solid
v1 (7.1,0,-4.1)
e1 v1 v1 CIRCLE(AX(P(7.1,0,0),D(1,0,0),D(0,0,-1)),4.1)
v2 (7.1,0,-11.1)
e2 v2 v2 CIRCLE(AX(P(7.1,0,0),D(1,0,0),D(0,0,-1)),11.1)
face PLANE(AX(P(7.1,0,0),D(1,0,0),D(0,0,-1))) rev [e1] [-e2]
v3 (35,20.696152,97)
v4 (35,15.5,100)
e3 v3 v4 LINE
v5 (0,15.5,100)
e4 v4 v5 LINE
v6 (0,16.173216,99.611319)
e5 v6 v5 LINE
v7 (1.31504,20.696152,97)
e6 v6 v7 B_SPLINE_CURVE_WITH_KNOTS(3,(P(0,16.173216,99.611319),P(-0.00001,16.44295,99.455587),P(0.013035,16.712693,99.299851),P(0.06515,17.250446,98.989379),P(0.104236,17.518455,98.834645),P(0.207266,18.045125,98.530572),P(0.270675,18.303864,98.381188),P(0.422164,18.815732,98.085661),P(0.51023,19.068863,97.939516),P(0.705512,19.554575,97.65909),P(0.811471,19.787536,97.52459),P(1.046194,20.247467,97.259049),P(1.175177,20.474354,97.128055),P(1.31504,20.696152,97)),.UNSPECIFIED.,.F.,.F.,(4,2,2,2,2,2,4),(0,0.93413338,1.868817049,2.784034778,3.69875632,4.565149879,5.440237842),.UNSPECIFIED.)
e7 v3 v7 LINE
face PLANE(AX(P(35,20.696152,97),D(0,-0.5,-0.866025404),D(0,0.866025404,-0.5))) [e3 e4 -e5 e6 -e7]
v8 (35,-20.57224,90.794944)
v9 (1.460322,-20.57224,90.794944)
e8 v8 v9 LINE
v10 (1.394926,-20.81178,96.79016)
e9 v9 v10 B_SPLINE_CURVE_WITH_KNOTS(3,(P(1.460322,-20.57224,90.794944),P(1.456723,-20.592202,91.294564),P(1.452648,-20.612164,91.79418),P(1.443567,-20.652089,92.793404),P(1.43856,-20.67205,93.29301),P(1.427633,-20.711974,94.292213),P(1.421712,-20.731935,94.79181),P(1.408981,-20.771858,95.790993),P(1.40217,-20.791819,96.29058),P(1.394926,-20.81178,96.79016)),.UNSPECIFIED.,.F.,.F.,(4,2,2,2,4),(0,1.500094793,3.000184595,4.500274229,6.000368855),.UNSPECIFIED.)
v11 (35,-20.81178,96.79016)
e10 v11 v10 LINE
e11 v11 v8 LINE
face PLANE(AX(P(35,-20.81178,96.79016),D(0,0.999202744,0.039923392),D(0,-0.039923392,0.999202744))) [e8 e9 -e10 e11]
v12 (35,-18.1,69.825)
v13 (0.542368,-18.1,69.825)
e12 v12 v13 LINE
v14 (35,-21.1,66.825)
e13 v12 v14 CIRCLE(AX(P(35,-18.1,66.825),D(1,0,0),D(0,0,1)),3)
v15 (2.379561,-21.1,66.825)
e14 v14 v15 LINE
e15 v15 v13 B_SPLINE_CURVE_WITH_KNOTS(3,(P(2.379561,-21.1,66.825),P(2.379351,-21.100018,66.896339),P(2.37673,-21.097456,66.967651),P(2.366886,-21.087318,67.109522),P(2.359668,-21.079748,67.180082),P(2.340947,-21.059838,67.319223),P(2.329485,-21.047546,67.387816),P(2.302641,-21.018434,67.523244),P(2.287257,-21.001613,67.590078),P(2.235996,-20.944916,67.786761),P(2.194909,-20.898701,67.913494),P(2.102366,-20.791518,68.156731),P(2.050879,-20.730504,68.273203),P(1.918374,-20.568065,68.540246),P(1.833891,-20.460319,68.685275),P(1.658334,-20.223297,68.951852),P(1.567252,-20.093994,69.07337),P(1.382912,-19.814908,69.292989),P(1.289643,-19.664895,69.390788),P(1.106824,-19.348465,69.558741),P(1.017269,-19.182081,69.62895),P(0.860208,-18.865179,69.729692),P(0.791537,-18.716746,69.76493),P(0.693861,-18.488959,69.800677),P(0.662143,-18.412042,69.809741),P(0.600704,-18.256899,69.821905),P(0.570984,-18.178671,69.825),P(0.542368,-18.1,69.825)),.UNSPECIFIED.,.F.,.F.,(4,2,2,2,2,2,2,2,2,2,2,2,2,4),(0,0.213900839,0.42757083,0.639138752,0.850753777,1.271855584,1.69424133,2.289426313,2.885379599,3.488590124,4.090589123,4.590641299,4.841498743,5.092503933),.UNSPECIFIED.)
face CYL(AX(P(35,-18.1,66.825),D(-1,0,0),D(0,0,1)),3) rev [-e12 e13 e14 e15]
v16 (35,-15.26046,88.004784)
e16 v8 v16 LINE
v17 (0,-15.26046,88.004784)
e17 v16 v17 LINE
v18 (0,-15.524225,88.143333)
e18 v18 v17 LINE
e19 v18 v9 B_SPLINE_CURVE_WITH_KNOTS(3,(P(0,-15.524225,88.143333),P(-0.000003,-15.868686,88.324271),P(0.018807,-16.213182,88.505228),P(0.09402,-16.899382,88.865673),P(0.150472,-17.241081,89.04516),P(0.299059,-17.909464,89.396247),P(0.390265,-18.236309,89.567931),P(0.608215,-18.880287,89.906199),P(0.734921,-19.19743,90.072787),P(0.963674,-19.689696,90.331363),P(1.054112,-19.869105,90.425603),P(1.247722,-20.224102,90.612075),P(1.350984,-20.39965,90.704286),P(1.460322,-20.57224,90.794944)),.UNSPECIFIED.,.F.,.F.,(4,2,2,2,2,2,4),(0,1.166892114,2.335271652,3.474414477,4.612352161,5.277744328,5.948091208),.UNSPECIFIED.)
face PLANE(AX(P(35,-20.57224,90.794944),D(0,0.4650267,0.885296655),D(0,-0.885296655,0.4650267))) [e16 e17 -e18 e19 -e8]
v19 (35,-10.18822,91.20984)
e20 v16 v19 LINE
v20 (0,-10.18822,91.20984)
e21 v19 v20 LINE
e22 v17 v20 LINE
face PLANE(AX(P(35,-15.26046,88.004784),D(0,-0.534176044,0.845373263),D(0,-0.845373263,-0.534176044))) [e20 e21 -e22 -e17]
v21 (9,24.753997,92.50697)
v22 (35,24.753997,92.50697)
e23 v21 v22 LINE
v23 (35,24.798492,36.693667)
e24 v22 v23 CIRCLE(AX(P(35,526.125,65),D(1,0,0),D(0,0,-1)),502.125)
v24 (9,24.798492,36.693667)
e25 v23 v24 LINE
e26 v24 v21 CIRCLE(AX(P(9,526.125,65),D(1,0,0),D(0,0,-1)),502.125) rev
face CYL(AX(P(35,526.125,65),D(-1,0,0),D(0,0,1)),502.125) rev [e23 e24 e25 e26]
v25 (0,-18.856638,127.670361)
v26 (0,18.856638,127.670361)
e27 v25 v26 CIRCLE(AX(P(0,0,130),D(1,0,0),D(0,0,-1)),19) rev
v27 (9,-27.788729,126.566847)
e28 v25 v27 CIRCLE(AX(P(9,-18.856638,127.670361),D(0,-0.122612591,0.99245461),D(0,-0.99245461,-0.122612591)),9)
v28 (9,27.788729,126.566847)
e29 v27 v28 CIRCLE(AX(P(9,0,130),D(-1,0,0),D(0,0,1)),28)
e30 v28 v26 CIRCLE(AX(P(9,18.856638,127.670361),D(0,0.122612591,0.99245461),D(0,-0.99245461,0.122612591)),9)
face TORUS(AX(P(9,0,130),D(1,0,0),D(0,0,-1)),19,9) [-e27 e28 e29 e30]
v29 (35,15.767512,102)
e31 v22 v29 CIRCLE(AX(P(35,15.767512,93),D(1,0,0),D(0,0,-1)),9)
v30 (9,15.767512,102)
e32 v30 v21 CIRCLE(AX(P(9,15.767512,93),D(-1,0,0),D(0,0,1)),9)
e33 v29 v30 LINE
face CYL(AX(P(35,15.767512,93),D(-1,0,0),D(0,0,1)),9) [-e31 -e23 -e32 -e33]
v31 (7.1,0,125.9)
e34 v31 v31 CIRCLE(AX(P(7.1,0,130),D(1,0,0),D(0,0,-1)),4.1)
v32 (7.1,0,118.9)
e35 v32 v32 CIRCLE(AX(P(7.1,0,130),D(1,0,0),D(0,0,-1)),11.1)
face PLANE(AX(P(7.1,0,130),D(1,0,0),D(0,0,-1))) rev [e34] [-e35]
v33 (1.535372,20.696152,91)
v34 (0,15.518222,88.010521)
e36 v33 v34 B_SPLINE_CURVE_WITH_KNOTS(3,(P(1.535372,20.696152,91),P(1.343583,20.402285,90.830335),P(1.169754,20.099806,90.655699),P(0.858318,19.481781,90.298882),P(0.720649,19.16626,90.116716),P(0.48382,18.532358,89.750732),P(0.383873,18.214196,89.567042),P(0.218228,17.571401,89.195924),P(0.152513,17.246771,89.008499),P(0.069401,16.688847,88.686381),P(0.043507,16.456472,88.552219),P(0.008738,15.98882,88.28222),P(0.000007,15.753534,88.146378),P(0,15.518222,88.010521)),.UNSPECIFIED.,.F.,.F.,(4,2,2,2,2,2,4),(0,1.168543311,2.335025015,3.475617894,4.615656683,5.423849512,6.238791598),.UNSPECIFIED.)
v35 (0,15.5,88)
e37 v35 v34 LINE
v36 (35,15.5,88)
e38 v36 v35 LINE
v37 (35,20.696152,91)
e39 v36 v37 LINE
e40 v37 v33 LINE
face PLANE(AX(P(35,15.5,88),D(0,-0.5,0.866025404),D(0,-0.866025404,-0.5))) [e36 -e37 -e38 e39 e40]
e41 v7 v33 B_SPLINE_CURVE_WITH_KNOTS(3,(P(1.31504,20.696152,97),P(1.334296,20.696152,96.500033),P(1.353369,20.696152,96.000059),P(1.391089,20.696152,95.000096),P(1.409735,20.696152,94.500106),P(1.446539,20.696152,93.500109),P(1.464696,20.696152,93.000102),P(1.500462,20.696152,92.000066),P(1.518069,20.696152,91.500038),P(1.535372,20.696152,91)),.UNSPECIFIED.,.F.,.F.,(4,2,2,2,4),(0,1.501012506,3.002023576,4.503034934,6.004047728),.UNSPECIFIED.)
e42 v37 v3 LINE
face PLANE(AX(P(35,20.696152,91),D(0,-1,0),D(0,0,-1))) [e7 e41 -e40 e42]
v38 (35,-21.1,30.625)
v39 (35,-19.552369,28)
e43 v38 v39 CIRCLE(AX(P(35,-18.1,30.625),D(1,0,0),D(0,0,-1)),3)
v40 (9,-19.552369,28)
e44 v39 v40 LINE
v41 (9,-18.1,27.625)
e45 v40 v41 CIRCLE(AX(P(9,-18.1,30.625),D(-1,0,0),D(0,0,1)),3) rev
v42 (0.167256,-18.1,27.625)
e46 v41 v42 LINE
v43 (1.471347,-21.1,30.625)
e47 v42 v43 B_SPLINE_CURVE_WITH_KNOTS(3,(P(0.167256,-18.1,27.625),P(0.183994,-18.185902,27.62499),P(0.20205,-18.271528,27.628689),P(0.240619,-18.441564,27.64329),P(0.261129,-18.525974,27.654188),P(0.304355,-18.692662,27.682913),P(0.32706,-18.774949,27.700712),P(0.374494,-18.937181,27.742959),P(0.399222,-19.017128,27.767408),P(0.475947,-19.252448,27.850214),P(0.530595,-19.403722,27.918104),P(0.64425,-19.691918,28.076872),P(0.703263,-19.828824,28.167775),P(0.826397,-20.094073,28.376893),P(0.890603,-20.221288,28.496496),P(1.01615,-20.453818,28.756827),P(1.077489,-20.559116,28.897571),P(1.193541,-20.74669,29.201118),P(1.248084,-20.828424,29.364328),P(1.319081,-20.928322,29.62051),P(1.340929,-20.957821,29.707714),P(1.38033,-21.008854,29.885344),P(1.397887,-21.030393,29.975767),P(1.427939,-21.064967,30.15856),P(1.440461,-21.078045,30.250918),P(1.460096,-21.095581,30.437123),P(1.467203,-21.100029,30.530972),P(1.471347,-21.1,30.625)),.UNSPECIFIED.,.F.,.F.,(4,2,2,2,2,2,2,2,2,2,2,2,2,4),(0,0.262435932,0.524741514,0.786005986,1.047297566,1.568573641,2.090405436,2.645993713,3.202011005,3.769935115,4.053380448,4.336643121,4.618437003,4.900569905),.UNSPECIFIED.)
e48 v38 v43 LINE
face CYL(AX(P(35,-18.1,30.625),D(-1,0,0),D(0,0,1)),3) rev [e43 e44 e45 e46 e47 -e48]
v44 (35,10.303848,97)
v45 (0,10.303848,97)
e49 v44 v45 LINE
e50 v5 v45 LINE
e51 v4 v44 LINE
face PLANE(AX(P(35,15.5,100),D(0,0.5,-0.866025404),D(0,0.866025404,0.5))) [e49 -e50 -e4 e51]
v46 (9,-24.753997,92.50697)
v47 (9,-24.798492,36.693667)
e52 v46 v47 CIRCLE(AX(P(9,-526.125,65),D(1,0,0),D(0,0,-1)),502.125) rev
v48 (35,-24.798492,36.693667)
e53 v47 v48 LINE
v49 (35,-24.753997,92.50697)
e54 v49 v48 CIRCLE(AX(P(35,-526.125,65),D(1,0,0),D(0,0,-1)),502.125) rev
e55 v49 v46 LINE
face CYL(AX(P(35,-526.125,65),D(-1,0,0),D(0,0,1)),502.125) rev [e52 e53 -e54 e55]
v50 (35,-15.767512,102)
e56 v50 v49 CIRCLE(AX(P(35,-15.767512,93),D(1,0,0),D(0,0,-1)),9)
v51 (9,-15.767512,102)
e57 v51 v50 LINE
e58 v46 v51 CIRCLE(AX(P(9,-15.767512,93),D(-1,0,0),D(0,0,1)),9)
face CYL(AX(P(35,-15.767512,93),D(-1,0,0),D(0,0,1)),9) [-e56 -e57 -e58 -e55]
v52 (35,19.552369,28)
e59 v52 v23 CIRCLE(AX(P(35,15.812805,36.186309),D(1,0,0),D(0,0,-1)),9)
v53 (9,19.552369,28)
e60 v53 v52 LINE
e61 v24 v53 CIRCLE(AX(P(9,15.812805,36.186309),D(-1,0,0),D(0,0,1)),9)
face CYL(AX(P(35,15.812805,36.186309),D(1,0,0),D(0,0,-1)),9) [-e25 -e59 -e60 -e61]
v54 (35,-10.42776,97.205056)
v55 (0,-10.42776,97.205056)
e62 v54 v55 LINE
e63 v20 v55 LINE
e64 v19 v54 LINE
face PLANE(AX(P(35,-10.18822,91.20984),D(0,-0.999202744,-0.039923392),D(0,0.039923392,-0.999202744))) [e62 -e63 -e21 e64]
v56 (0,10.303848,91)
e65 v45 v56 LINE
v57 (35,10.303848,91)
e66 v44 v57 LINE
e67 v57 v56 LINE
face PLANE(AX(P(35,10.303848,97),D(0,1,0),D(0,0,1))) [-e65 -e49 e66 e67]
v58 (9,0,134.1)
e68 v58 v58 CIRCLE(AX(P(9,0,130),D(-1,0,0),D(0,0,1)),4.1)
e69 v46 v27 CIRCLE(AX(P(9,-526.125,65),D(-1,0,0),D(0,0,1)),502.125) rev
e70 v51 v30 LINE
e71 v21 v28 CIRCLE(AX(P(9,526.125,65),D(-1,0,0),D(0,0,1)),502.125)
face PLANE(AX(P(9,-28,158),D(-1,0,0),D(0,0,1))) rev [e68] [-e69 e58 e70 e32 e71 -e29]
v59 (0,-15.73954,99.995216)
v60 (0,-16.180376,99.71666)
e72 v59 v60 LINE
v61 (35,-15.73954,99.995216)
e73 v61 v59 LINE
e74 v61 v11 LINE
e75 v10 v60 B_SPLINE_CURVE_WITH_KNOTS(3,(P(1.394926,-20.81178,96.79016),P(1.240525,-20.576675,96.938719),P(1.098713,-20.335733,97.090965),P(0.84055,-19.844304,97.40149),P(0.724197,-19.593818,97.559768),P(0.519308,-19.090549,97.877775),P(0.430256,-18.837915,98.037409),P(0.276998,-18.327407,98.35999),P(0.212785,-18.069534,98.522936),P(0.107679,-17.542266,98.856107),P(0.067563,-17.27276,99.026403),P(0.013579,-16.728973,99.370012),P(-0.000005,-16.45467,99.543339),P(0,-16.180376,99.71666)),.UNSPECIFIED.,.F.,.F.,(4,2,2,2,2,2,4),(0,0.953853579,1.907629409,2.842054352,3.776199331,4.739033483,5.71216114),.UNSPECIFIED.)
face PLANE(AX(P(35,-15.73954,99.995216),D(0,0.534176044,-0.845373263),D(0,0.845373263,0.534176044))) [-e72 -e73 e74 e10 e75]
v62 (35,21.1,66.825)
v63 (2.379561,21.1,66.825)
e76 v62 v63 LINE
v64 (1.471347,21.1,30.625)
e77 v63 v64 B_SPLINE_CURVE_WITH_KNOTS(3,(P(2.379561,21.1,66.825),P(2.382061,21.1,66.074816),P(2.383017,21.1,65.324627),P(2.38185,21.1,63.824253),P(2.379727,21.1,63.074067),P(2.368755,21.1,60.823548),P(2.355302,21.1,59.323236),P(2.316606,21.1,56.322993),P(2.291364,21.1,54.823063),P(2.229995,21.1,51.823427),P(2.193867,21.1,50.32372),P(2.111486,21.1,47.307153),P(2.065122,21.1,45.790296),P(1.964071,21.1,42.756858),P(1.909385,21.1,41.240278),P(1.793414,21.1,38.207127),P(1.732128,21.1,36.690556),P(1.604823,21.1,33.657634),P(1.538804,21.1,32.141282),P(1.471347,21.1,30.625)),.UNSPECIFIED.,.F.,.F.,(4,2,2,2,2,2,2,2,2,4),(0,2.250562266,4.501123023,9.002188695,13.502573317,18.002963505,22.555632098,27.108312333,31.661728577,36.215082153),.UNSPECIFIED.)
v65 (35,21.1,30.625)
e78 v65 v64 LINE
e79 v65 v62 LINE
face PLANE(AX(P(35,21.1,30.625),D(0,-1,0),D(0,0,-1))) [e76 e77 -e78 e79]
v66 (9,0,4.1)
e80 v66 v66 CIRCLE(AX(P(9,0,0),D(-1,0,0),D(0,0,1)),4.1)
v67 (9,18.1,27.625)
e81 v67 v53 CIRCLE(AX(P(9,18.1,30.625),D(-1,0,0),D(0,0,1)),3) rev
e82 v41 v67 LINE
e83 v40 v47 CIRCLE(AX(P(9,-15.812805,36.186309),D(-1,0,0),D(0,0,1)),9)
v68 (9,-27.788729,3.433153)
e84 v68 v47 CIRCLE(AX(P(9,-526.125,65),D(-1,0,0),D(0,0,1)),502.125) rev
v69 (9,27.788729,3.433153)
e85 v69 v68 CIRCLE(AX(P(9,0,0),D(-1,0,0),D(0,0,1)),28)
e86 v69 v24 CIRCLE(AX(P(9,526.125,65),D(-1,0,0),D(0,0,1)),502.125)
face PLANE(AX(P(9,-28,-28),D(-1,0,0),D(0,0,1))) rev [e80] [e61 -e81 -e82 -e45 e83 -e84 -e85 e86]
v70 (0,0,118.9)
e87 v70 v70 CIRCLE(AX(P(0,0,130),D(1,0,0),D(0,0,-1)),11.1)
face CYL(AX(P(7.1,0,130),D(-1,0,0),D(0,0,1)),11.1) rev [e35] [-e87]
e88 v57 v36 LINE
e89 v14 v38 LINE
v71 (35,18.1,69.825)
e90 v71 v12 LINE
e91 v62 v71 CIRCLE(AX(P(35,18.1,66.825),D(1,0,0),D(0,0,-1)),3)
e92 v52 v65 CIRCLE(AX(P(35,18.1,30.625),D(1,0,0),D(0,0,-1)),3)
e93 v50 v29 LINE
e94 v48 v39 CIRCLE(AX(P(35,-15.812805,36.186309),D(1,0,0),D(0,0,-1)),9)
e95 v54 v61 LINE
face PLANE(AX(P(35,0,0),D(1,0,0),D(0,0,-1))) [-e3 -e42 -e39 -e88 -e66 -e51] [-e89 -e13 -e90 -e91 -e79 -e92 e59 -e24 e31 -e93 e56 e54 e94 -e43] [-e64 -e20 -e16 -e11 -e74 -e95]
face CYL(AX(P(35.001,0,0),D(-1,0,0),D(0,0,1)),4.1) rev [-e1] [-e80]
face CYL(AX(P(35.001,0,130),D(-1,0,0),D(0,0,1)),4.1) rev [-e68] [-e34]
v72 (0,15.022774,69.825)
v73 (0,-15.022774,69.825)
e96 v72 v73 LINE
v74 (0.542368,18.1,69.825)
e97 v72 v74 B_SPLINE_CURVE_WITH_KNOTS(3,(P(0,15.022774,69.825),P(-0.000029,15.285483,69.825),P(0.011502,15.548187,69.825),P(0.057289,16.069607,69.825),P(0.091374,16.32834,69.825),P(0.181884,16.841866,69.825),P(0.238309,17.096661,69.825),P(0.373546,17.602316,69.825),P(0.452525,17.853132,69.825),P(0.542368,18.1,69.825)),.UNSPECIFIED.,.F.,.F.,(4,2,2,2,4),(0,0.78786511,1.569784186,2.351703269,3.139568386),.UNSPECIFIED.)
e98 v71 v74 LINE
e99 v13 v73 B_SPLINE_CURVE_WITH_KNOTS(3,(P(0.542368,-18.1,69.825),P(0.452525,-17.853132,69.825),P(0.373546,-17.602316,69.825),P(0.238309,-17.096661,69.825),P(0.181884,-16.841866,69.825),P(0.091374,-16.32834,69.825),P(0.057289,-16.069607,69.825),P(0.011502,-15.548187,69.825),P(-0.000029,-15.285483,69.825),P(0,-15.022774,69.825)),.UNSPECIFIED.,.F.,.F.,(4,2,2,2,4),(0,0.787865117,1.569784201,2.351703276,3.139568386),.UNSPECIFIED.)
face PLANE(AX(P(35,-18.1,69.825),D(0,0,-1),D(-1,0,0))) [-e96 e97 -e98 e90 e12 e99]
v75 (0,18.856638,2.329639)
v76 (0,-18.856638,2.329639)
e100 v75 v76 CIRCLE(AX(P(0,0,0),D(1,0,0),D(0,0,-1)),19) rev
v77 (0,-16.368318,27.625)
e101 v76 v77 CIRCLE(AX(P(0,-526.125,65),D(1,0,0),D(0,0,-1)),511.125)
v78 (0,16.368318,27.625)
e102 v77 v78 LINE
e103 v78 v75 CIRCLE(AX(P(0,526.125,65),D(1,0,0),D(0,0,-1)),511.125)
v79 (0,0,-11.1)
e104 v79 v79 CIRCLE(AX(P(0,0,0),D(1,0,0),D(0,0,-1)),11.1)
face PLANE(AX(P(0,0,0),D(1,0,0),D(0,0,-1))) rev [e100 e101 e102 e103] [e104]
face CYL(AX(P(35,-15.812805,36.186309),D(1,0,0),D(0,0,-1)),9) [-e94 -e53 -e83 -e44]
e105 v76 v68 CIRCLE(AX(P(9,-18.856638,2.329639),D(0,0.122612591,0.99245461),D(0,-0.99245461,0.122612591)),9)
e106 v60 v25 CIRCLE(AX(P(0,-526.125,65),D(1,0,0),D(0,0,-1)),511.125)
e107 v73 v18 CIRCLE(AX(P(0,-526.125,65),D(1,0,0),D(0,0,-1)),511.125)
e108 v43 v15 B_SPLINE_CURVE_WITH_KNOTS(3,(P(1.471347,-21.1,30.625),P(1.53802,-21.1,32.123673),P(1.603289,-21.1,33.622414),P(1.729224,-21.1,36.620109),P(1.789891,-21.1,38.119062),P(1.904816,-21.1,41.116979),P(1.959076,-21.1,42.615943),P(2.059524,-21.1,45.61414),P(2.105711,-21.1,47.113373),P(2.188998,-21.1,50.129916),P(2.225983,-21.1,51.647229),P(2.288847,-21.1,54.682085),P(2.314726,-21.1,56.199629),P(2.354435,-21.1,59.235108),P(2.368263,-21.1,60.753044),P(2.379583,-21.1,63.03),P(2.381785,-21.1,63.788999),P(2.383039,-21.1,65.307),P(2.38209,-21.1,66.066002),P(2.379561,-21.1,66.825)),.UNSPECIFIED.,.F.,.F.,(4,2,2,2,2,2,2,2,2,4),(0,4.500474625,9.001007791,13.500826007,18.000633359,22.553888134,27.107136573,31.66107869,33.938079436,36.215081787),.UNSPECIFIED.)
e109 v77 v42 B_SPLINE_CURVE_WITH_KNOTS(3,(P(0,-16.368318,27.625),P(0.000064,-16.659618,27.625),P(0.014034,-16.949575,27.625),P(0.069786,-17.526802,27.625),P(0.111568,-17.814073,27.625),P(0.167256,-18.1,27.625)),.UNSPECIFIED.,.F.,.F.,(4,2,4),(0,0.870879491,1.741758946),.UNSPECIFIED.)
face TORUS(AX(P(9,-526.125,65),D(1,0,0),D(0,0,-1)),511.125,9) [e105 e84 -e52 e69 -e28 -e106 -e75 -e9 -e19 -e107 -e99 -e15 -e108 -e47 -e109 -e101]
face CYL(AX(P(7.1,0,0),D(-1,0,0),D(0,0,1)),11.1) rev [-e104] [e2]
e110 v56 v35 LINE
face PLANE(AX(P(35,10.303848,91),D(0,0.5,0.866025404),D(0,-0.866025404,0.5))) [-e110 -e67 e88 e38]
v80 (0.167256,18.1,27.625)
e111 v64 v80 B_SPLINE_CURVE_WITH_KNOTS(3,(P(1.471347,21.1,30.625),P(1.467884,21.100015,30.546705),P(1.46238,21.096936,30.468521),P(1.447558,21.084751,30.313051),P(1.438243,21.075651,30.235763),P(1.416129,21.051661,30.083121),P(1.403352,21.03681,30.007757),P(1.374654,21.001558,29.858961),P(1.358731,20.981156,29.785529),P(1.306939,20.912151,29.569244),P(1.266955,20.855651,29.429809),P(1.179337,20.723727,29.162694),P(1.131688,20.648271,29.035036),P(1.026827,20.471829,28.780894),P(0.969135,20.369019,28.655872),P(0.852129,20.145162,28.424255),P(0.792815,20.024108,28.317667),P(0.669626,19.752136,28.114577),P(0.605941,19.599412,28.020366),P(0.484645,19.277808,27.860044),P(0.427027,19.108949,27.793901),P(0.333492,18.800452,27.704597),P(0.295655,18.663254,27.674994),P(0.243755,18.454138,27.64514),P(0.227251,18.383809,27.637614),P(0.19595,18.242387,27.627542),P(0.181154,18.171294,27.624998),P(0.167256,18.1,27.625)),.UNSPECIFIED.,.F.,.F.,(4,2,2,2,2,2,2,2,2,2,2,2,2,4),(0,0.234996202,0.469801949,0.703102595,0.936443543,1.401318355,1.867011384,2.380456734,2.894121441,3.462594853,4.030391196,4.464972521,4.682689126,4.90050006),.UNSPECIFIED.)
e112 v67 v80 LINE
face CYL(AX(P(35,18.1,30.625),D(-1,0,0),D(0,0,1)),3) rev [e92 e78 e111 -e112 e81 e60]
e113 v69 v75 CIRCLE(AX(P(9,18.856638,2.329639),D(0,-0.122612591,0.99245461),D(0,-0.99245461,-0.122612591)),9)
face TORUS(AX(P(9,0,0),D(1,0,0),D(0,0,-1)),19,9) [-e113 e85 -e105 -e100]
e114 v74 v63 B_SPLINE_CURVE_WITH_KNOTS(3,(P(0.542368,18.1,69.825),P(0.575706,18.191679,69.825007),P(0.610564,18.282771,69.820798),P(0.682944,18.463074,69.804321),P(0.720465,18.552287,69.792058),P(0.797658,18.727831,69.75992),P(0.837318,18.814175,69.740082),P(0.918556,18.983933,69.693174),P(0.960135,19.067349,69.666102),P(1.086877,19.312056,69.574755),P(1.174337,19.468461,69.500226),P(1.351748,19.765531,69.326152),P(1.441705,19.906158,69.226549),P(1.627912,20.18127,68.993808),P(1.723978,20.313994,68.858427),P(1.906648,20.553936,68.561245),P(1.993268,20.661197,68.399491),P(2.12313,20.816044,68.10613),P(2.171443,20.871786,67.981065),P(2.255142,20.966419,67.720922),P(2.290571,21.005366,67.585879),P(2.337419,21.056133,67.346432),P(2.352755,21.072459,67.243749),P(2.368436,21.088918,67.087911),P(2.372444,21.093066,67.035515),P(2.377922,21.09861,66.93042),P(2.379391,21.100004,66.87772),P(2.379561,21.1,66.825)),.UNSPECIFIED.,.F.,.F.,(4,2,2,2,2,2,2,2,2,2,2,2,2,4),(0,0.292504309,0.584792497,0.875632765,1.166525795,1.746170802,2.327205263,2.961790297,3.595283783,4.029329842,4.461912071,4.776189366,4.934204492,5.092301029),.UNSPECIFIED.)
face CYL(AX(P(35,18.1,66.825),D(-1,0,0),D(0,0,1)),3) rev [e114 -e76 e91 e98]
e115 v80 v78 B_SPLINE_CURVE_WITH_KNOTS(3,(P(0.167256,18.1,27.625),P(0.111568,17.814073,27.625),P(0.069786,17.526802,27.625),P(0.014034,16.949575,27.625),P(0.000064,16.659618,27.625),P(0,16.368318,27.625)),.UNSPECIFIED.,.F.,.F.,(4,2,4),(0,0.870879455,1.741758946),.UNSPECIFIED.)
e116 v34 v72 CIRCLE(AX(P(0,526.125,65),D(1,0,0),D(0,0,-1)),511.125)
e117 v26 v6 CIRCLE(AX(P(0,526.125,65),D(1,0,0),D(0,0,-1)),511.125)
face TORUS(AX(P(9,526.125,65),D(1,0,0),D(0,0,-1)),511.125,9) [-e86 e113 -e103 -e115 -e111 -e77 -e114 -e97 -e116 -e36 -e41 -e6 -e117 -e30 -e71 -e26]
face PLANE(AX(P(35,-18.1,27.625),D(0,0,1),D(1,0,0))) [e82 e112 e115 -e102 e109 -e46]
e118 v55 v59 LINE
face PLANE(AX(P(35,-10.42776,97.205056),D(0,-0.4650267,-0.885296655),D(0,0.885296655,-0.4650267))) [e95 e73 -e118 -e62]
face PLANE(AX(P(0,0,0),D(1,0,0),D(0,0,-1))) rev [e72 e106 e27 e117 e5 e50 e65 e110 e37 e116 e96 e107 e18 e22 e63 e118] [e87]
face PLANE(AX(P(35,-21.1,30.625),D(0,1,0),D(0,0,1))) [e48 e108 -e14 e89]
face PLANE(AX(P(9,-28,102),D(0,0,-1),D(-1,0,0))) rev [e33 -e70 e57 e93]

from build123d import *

# Parameters (mm, degrees)
BOSS_EXTRUDE1_DEPTH     = 35
CUT_EXTRUDE1_DEPTH      = 165.23458831805192
CUT_EXTRUDE1_DEPTH_BACK = 165.23458831805192
CUT_EXTRUDE2_DEPTH      = 165.23458831805192
CUT_EXTRUDE3_DEPTH      = 165.23458831805192
CUT_EXTRUDE4_REACH      = 166.235
SKETCH7_R               = 4.1
SKETCH7_R_2             = 4.099999999999986
SKETCH7_3_R             = 11.1
CUT_EXTRUDE5_DEPTH      = 7.1
FILLET1_R               = 9
FILLET2_START           = 9
FILLET2_DEPTH           = 26


with BuildPart() as part:
    # Sketch1 → Boss-Extrude1 (new body)
    with BuildSketch(Plane(origin=(0, 0, 0), x_dir=(0, 0, -1), z_dir=(1, 0, 0))):
        with BuildLine():
            ThreePointArc((-3.4331525583588727, 27.788729073331762), (-20.97770568525129, 18.545507924642443), (-28, 3.43e-15))
            Line((-28, 0), (28, 0))
            ThreePointArc((28, 0), (18.545507924642447, 20.977705685251287), (-3.4331525583588727, 27.788729073331762))
        make_face()
        with BuildLine():
            Line((28, 0), (-28, 0))
            ThreePointArc((-28, 3.43e-15), (-20.977705685251298, -18.545507924642436), (-3.433152558358892, -27.78872907333176))
            ThreePointArc((-3.433152558358892, -27.78872907333176), (18.545507924642436, -20.977705685251298), (28, -6.86e-15))
        make_face()
        with BuildLine():
            ThreePointArc((-126.56684744164114, 27.788729073331766), (-109.02229431474872, 18.54550792464245), (-102, 0))
            Line((-102, 0), (-28, 0))
            ThreePointArc((-28, 3.43e-15), (-20.97770568525129, 18.545507924642443), (-3.4331525583588727, 27.788729073331762))
            ThreePointArc((-3.433152558358863, 27.788729073331695), (-65, 23.999999999999602), (-126.56684744164116, 27.788729073331638))
        make_face()
        with BuildLine():
            Line((-28, 0), (-102, 0))
            ThreePointArc((-102, -6.86e-15), (-109.0222943147487, -18.545507924642447), (-126.56684744164114, -27.788729073331766))
            ThreePointArc((-126.56684744164116, -27.788729073331638), (-65, -23.999999999999602), (-3.433152558358863, -27.788729073331695))
            ThreePointArc((-3.433152558358892, -27.78872907333176), (-20.977705685251298, -18.545507924642436), (-28, 3.43e-15))
        make_face()
        with BuildLine():
            ThreePointArc((-126.56684744164114, 27.788729073331766), (-148.54550792464244, 20.977705685251287), (-158, 3.43e-15))
            Line((-158, 0), (-102, 0))
            ThreePointArc((-102, 0), (-109.02229431474872, 18.54550792464245), (-126.56684744164114, 27.788729073331766))
        make_face()
        with BuildLine():
            Line((-102, 0), (-158, 0))
            ThreePointArc((-158, 3.43e-15), (-148.54550792464244, -20.97770568525128), (-126.56684744164114, -27.788729073331766))
            ThreePointArc((-126.56684744164114, -27.788729073331766), (-109.0222943147487, -18.545507924642447), (-102, -6.86e-15))
        make_face()
    extrude(amount=BOSS_EXTRUDE1_DEPTH)

    # Sketch4 → Cut-Extrude1 (cut, two sides: drawn at the far end of the back side and taken through both)
    with BuildSketch(Plane(origin=(0, 0, 0), x_dir=(1, 0, 0), z_dir=(0, 1, 0)).offset(-CUT_EXTRUDE1_DEPTH_BACK)):
        Polygon((8.999999999999998, 27.999999999999996), (61, 27.999999999999996), (61, -28.000000000000004), (9.000000000000005, -28.000000000000004), align=None)
        Polygon((60.999999999999986, -157.99999999999997), (60.99999999999993, -101.99999999999999), (8.999999999999956, -101.99999999999999), (8.99999999999997, -157.99999999999997), align=None)
    extrude(amount=CUT_EXTRUDE1_DEPTH + CUT_EXTRUDE1_DEPTH_BACK, mode=Mode.SUBTRACT)

    # Sketch6 → Cut-Extrude2 (cut, through all)
    with BuildSketch(Plane(origin=(0, 0, 0), x_dir=(0, 0, -1), z_dir=(1, 0, 0))):
        with BuildLine():
            Line((-30.624999999999996, -21.1), (-66.82499999999999, -21.100000000000005))
            ThreePointArc((-66.82499999999999, -21.100000000000005), (-68.94632034355963, -20.221320343559647), (-69.825, -18.100000000000005))
            Line((-69.825, -18.100000000000005), (-69.825, 18.099999999999998))
            ThreePointArc((-69.825, 18.099999999999998), (-68.94632034355963, 20.22132034355964), (-66.82499999999999, 21.099999999999998))
            Line((-66.82499999999999, 21.099999999999998), (-30.624999999999996, 21.1))
            ThreePointArc((-30.624999999999996, 21.1), (-28.503679656440355, 20.221320343559643), (-27.624999999999996, 18.1))
            Line((-27.624999999999996, 18.1), (-27.624999999999996, -18.1))
            ThreePointArc((-27.624999999999996, -18.1), (-28.503679656440355, -20.221320343559643), (-30.624999999999996, -21.1))
        make_face()
    extrude(amount=CUT_EXTRUDE2_DEPTH, mode=Mode.SUBTRACT)

    # Sketch8 → Cut-Extrude3 (cut, through all)
    with BuildSketch(Plane(origin=(0, 0, 0), x_dir=(0, 0, -1), z_dir=(1, 0, 0))):
        Polygon((-99.99999999999986, 15.499999999999991), (-96.9999999999999, 10.303847577293476), (-91.00000000000006, 10.303847577293476), (-88.00000000000014, 15.500000000000032), (-91.00000000000013, 20.696152422706533), (-96.99999999999999, 20.69615242270647), align=None)
        Polygon((-99.99521646144645, -15.739540352344857), (-96.7901602003611, -20.811779932971724), (-90.79494373891465, -20.57223958062687), (-88.00478353855354, -15.26045964765515), (-91.20983979963889, -10.188220067028302), (-97.20505626108536, -10.427760419373156), align=None)
    extrude(amount=CUT_EXTRUDE3_DEPTH, mode=Mode.SUBTRACT)

    # Sketch7 → Cut-Extrude4 (cut, up to next)
    with BuildSketch(Plane(origin=(0, 0, 0), x_dir=(0, 0, -1), z_dir=(1, 0, 0)), mode=Mode.PRIVATE) as cut_extrude4_sk1:
        with Locations(Location((0, 0, 0), (0, 0, 180))):
            Circle(SKETCH7_R)
    cut_extrude4_tool1 = extrude(cut_extrude4_sk1.sketch, amount=CUT_EXTRUDE4_REACH, mode=Mode.PRIVATE) & part.part
    # Sketch7 → Cut-Extrude4 (cut, up to next)
    with BuildSketch(Plane(origin=(0, 0, 0), x_dir=(0, 0, -1), z_dir=(1, 0, 0)), mode=Mode.PRIVATE) as cut_extrude4_sk2:
        with Locations(Location((-130, 0, 0), (0, 0, 180))):
            Circle(SKETCH7_R_2)
    cut_extrude4_tool2 = extrude(cut_extrude4_sk2.sketch, amount=CUT_EXTRUDE4_REACH, mode=Mode.PRIVATE) & part.part
    add(cut_extrude4_tool1.solids().sort_by_distance((0, 0, 0))[0], mode=Mode.SUBTRACT)
    add(cut_extrude4_tool2.solids().sort_by_distance((0, 0, 130))[0], mode=Mode.SUBTRACT)

    # Sketch7<3> → Cut-Extrude5 (cut)
    with BuildSketch(Plane(origin=(0, 0, 0), x_dir=(0, 0, -1), z_dir=(1, 0, 0))):
        Circle(SKETCH7_3_R)
        with Locations((-130, 0)):
            Circle(SKETCH7_3_R)
    extrude(amount=CUT_EXTRUDE5_DEPTH, mode=Mode.SUBTRACT)

    # Fillet1
    # the kernel refuses this fillet: 9 mm, written as the material it takes off along each edge
    with BuildSketch(Plane(origin=(0, -7.11e-15, 130), x_dir=(0, 0.9924546097618487, -0.12261259136995861), z_dir=(0, -0.12261259136995861, -0.9924546097618487))) as fillet1_piece_1:
        with BuildLine():
            CenterArc((28 - FILLET1_R, FILLET1_R), FILLET1_R, 270, 89.99999999999999)
            Line((28, FILLET1_R), (28, 0))
            Line((28, 0), (28 - FILLET1_R, 0))
        make_face()
    revolve(axis=Axis((0, -7.11e-15, 130), (1, 0, 0)), revolution_arc=194.0858135076888, mode=Mode.SUBTRACT)
    with BuildSketch(Plane(origin=(0, 526.1249999999663, 65.00000000000024), x_dir=(0, -0.9924546097618476, -0.12261259136996856), z_dir=(0, 0.12261259136996856, -0.9924546097618476))) as fillet1_piece_2:
        with BuildLine():
            CenterArc((502.12499999996675 + FILLET1_R, -FILLET1_R), FILLET1_R, 90, 90)
            Line((502.12499999996675 + FILLET1_R, 1.78e-15), (502.12499999996675, 0))
            Line((502.12499999996675, 0), (502.12499999996675, -FILLET1_R))
        make_face()
    revolve(axis=Axis((0, 526.1249999999663, 65.00000000000024), (-1, 0, 0)), revolution_arc=14.085813507689899, mode=Mode.SUBTRACT)
    with BuildSketch(Plane(origin=(0, 1.78e-15, -1.78e-15), x_dir=(0, -0.9924546097618486, 0.12261259136995943), z_dir=(0, 0.12261259136995943, 0.9924546097618486))) as fillet1_piece_3:
        with BuildLine():
            CenterArc((28 - FILLET1_R, FILLET1_R), FILLET1_R, 270, 90)
            Line((27.999999999999996, FILLET1_R), (28, 0))
            Line((28, 0), (28 - FILLET1_R, 0))
        make_face()
    revolve(axis=Axis((0, 1.78e-15, -1.78e-15), (1, 0, 0)), revolution_arc=194.0858135076889, mode=Mode.SUBTRACT)
    with BuildSketch(Plane(origin=(0, -526.1249999999588, 65.00000000000026), x_dir=(0, 0.9924546097618475, 0.12261259136996942), z_dir=(0, -0.12261259136996942, 0.9924546097618475))) as fillet1_piece_4:
        with BuildLine():
            CenterArc((502.1249999999594 + FILLET1_R, -FILLET1_R), FILLET1_R, 90, 90)
            Line((502.1249999999594 + FILLET1_R, 1.78e-15), (502.1249999999594, 0))
            Line((502.1249999999594, 0), (502.1249999999594, -FILLET1_R))
        make_face()
    revolve(axis=Axis((0, -526.1249999999588, 65.00000000000026), (-1, 0, 0)), revolution_arc=14.085813507690109, mode=Mode.SUBTRACT)

    # Fillet2: read off the stored shape, not the designer's step
    # Fillet2 outline → Fillet2 (cut)
    with BuildSketch(Plane.YZ.offset(FILLET2_START)):
        with BuildLine():
            ThreePointArc((25.365061881, 28), (25.062921918, 32.34560469), (24.798492486, 36.693666988))
            ThreePointArc((24.798492486, 36.693666988), (23.518514891, 31.536360045), (19.552368755, 28))
            Line((19.552368755, 28), (25.365061881, 28))
        make_face()
        with BuildLine():
            Line((25.365061881, 102), (15.767511934, 102))
            ThreePointArc((15.767511934, 102), (22.303461396, 99.187193599), (24.753997417, 92.506969919))
            ThreePointArc((24.753997417, 92.506969919), (25.037048655, 97.254932057), (25.365061881, 102))
        make_face()
        with BuildLine():
            ThreePointArc((-25.365061881, 102), (-25.037048655, 97.254932057), (-24.753997417, 92.506969919))
            ThreePointArc((-24.753997417, 92.506969919), (-22.303461396, 99.187193599), (-15.767511934, 102))
            Line((-15.767511934, 102), (-25.365061881, 102))
        make_face()
        with BuildLine():
            ThreePointArc((-19.552368755, 28), (-23.518514891, 31.536360045), (-24.798492486, 36.693666988))
            ThreePointArc((-24.798492486, 36.693666988), (-25.062921918, 32.34560469), (-25.365061881, 28))
            Line((-25.365061881, 28), (-19.552368755, 28))
        make_face()
    extrude(amount=FILLET2_DEPTH, mode=Mode.SUBTRACT)


solid = part.part
